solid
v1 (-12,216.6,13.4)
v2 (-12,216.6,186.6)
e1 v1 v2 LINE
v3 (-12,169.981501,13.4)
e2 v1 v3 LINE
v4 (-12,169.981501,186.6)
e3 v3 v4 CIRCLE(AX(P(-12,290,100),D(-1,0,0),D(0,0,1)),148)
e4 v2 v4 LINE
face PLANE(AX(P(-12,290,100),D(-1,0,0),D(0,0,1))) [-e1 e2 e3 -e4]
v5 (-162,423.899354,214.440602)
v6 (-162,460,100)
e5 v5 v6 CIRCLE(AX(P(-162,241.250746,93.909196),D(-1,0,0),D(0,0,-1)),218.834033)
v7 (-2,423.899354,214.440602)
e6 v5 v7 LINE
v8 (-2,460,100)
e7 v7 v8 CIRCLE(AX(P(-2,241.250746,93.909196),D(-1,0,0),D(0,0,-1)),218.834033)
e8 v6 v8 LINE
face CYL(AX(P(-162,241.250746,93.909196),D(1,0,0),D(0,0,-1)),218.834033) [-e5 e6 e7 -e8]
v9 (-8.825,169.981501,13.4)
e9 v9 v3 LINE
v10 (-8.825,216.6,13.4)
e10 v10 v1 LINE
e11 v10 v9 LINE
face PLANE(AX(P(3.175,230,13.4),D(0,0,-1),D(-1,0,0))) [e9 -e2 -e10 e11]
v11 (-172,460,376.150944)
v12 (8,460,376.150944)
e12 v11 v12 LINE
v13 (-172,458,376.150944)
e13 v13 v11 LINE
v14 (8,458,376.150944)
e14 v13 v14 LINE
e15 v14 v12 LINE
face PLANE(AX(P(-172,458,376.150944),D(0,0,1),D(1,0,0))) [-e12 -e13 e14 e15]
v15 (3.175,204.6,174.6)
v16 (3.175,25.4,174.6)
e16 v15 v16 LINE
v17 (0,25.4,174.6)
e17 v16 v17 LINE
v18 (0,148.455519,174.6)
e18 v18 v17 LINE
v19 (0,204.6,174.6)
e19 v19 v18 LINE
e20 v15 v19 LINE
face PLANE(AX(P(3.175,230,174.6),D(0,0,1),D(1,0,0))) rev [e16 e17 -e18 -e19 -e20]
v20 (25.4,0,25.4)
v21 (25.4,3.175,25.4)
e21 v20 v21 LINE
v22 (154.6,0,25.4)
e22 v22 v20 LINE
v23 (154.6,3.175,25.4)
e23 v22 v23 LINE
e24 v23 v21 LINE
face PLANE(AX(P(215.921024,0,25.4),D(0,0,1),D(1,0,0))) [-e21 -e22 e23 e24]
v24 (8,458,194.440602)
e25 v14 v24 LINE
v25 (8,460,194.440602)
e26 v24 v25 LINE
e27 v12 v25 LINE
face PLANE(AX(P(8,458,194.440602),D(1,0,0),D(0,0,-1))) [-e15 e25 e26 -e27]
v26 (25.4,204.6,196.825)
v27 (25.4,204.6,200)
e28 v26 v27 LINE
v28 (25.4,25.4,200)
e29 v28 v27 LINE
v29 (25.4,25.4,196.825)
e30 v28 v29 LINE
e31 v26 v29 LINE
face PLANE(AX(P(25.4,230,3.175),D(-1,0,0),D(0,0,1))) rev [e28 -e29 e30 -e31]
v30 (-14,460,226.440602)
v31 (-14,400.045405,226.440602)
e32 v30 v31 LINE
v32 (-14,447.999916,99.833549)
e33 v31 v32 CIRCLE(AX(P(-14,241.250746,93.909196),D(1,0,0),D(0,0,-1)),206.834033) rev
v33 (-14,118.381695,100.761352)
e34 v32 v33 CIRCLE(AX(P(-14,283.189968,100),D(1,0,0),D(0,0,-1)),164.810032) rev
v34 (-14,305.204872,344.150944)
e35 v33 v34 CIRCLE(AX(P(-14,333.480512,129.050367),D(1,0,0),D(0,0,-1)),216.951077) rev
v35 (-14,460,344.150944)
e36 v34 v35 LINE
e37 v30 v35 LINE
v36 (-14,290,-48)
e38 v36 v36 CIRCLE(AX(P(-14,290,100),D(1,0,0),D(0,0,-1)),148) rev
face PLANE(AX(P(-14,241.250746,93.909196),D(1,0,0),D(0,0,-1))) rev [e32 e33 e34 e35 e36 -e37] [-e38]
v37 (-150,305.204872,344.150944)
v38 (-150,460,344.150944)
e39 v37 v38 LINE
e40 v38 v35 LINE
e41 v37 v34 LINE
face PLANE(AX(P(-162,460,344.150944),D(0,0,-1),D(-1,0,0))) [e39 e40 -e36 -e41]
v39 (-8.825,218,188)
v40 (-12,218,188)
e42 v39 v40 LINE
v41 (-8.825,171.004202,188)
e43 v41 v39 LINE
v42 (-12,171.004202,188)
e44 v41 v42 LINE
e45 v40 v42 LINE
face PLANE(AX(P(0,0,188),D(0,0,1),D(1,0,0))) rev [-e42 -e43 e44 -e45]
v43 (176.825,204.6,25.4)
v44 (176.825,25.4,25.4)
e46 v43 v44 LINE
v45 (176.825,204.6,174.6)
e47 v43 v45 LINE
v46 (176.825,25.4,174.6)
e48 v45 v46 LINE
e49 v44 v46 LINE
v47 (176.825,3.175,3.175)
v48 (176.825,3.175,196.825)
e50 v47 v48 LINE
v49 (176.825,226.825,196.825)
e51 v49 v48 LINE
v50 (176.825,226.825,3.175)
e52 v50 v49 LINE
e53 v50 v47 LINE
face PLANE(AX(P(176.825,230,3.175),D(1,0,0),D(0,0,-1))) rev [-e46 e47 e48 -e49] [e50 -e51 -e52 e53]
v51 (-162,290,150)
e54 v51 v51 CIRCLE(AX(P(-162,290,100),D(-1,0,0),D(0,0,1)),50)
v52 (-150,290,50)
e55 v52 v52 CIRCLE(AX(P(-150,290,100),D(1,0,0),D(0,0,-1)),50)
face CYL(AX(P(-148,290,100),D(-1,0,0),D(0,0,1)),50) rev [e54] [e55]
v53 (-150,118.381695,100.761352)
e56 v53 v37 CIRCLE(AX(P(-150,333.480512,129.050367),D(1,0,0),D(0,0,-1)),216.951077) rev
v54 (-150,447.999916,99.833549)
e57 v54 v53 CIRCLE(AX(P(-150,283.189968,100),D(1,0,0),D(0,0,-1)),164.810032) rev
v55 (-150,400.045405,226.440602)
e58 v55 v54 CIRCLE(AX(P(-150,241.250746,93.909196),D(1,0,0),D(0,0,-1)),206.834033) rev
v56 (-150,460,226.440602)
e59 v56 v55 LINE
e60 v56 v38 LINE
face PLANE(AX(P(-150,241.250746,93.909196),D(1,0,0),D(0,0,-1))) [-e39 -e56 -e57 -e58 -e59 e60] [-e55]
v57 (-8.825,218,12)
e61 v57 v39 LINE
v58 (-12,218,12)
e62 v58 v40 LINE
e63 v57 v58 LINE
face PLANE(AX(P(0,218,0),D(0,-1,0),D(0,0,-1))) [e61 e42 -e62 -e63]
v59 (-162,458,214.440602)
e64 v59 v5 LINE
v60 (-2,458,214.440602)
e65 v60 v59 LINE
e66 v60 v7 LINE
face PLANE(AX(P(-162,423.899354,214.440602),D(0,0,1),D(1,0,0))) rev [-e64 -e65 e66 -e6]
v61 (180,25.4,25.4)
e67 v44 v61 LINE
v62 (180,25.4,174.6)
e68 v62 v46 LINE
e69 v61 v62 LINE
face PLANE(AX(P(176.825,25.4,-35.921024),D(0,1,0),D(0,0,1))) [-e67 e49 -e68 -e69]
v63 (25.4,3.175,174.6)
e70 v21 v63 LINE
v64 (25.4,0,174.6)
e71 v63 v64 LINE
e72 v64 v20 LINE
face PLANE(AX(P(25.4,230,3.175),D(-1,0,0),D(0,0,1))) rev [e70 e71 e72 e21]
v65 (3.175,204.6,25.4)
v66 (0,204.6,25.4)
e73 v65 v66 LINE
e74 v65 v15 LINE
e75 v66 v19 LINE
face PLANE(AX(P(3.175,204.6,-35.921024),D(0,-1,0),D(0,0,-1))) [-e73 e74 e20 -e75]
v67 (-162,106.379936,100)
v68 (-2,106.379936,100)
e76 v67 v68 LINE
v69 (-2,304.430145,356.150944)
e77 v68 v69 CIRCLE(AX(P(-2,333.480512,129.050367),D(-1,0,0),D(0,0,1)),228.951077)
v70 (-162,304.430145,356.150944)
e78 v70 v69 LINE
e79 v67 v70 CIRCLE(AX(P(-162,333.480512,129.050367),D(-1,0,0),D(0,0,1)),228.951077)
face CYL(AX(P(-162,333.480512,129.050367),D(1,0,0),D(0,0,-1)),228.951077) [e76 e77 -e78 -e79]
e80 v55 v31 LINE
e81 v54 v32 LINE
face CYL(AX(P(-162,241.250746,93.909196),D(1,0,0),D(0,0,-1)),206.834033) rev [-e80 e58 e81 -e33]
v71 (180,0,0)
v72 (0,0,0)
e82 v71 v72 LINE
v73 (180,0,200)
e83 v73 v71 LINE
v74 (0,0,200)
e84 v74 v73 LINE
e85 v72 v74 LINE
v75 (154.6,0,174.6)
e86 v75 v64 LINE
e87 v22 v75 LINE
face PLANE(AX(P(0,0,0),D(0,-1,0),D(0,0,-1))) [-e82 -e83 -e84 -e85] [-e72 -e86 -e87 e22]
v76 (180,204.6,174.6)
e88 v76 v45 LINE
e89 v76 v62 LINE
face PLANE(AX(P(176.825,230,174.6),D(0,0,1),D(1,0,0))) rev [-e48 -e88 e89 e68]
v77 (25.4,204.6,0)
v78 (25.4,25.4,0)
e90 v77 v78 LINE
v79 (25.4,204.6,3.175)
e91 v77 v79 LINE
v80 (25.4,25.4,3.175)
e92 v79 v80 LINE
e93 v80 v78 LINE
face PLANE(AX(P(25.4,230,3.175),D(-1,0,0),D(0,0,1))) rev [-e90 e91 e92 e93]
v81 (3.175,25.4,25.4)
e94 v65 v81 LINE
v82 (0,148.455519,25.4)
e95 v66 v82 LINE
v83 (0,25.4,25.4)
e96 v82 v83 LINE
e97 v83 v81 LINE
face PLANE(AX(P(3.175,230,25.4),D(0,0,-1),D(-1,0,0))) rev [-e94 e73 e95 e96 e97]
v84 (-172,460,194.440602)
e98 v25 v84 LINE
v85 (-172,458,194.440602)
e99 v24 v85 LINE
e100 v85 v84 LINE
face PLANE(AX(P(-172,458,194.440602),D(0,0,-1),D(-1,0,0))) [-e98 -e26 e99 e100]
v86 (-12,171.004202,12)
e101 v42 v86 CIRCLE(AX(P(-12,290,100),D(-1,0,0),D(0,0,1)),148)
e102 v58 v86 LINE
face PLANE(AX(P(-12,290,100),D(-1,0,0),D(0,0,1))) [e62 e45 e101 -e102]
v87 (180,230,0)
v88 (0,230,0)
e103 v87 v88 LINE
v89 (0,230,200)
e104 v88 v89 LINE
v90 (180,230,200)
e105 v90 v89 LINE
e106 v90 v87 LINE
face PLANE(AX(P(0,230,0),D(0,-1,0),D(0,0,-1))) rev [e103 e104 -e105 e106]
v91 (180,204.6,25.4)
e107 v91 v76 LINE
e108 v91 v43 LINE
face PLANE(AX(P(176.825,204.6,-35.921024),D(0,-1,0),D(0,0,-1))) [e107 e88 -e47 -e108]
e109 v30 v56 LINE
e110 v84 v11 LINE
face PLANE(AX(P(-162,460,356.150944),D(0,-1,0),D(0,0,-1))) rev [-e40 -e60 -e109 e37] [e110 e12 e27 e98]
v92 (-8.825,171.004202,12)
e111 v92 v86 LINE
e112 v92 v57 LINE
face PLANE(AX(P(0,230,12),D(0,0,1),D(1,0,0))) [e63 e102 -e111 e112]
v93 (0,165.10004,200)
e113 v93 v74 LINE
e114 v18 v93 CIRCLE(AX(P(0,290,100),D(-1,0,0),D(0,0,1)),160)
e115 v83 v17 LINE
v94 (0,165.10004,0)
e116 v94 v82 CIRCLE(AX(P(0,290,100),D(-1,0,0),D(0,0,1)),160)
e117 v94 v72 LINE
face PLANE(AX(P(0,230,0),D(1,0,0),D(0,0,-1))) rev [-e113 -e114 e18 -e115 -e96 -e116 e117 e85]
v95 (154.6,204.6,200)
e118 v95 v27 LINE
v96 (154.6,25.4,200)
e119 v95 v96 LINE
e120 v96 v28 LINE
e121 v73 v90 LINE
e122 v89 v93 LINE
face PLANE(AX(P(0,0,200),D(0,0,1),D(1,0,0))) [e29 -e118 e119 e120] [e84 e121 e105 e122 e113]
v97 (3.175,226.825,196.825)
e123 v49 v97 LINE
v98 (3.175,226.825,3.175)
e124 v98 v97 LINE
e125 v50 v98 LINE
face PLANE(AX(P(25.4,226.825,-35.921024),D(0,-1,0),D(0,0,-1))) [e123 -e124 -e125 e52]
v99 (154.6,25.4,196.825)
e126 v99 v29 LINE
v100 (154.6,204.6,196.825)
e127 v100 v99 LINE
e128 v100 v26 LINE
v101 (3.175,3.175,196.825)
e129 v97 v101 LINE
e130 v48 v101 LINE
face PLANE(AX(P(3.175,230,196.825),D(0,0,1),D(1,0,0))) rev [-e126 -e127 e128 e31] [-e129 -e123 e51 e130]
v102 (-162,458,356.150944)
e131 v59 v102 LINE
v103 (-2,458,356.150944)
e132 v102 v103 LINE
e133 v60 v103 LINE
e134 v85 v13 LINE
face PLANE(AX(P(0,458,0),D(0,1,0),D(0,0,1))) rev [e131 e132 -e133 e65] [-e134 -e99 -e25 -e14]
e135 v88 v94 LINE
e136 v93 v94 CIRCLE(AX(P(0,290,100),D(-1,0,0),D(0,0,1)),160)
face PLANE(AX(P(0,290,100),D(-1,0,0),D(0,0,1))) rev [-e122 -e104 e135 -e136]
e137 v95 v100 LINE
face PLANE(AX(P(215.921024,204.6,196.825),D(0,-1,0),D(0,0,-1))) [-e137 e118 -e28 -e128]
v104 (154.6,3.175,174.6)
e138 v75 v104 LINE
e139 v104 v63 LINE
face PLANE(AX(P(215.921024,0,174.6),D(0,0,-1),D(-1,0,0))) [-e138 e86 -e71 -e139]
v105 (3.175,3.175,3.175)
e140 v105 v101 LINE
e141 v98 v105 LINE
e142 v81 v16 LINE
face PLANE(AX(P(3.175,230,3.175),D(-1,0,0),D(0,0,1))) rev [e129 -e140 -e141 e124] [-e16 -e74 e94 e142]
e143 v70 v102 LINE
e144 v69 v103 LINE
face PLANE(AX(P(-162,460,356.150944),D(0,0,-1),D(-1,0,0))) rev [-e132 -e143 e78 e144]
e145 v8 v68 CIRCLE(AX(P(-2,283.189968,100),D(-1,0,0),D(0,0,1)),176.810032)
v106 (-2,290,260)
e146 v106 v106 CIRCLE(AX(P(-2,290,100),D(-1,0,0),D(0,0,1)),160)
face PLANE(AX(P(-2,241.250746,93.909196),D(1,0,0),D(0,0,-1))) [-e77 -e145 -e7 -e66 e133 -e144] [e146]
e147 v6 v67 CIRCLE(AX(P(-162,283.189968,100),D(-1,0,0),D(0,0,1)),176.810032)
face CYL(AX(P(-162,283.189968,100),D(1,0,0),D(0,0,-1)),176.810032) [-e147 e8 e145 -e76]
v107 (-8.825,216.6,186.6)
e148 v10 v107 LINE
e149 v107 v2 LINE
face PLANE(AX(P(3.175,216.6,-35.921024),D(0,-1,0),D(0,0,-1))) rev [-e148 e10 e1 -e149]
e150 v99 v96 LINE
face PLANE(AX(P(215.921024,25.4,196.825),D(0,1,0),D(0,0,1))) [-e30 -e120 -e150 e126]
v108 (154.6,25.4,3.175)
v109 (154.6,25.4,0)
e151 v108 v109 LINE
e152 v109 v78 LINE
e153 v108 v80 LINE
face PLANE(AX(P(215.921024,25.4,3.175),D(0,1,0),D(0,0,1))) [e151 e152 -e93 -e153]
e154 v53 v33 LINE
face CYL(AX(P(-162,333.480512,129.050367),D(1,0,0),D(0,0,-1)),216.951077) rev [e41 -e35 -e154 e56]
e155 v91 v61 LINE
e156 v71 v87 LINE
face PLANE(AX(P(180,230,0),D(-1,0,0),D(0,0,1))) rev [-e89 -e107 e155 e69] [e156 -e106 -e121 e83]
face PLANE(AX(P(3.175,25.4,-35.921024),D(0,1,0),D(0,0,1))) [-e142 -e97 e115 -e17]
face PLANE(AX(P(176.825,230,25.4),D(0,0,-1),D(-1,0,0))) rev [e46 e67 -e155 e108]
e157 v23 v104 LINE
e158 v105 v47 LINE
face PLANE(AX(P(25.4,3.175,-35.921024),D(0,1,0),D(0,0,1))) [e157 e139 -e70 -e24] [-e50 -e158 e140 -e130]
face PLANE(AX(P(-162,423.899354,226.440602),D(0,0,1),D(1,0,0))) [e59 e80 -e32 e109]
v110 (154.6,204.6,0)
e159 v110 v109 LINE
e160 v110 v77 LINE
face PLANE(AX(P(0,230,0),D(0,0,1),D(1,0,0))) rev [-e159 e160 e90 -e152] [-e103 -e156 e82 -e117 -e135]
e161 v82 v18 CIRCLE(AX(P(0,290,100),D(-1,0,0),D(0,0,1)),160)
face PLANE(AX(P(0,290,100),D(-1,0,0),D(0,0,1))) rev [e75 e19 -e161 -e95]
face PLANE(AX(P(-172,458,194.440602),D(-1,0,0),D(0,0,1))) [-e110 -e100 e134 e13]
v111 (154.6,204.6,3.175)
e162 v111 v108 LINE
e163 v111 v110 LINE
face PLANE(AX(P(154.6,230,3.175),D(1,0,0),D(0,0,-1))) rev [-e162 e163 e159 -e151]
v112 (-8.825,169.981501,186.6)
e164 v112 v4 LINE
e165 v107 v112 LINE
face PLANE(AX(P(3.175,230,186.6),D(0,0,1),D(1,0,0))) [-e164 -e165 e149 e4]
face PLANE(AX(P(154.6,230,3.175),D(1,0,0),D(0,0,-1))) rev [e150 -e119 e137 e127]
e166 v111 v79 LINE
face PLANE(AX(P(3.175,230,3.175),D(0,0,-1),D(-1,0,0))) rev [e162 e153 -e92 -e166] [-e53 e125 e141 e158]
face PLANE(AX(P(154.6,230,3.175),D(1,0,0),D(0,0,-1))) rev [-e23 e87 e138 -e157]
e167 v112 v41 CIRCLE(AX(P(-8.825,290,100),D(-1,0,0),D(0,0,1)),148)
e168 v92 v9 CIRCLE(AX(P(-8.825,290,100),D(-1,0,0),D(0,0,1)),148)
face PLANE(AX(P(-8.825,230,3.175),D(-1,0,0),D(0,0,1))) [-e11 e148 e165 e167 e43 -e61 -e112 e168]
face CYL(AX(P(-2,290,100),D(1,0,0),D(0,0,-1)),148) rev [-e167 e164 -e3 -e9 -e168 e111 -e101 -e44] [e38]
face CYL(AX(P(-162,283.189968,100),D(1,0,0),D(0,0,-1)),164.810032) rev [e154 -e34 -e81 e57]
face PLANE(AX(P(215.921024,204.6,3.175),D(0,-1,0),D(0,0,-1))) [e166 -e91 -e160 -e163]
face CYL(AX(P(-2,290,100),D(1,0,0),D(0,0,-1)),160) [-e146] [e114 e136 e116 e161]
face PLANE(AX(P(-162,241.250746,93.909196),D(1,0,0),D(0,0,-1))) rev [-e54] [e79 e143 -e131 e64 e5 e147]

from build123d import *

# Parameters (mm, degrees)
SALIENTE_EXTRUIR1_DEPTH   = 230
SALIENTE_EXTRUIR1_2_DEPTH = 230
SALIENTE_EXTRUIR1_3_DEPTH = 230
SALIENTE_EXTRUIR1_4_DEPTH = 230
SALIENTE_EXTRUIR2_REACH   = 355.977
SALIENTE_EXTRUIR3_DEPTH   = 180
CROQUIS4_W                = 149.2
CROQUIS4_H                = 3.175
SALIENTE_EXTRUIR4_DEPTH   = 154.6
CROQUIS5_R                = 160
SALIENTE_EXTRUIR5_DEPTH   = 2
SALIENTE_EXTRUIR6_DEPTH   = 160
CROQUIS7_W                = 180
CROQUIS7_H                = 181.710341205
SALIENTE_EXTRUIR7_DEPTH   = 2
VACIADO1_START            = -150
VACIADO1_DEPTH            = 136
VACIADO1_START_2          = -14
VACIADO1_2_OUTLINE_R      = 148
VACIADO1_2_DEPTH          = 2
VACIADO1_START_3          = -12
VACIADO1_3_DEPTH          = 3.175
CROQUIS8_R                = 50
CORTAR_EXTRUIR1_DEPTH     = 14


# Read off the part's stored shape, not the designer's step: Vaciado1
with BuildPart() as part:
    # Croquis1 → Saliente-Extruir1 (new body)
    with BuildSketch(Plane(origin=(0, 0, 0), x_dir=(1, 0, 0), z_dir=(0, 1, 0))):
        Polygon((0, 0), (25.4, 0), (25.4, -3.175), (3.175, -3.175), (3.175, -25.4), (0, -25.4), align=None)
    extrude(amount=SALIENTE_EXTRUIR1_DEPTH)

    # Saliente-Extruir2: up to this face of the body (flat: up to its plane)
    saliente_extruir2_end = Plane(part.part.faces().sort_by_distance((12.7, 115, 0))[0])
    # Croquis2 → Saliente-Extruir2 (add, up to the picked face)
    with BuildSketch(Plane.XY.offset(200), mode=Mode.PRIVATE) as saliente_extruir2_sk1:
        Polygon((25.4, 230), (0, 230), (0, 204.6), (3.175, 204.6), (3.175, 226.825), (25.4, 226.825), align=None)
    saliente_extruir2_tool1 = split(extrude(saliente_extruir2_sk1.sketch, amount=-SALIENTE_EXTRUIR2_REACH, mode=Mode.PRIVATE), bisect_by=saliente_extruir2_end, keep=Keep.BOTH, mode=Mode.PRIVATE)
    # Croquis2 → Saliente-Extruir2 (add, up to the picked face)
    with BuildSketch(Plane.XY.offset(200), mode=Mode.PRIVATE) as saliente_extruir2_sk2:
        Polygon((176.825, 204.6), (180, 204.6), (180, 230), (154.6, 230), (154.6, 226.825), (176.825, 226.825), align=None)
    saliente_extruir2_tool2 = split(extrude(saliente_extruir2_sk2.sketch, amount=-SALIENTE_EXTRUIR2_REACH, mode=Mode.PRIVATE), bisect_by=saliente_extruir2_end, keep=Keep.BOTH, mode=Mode.PRIVATE)
    # Croquis2 → Saliente-Extruir2 (add, up to the picked face)
    with BuildSketch(Plane.XY.offset(200), mode=Mode.PRIVATE) as saliente_extruir2_sk3:
        Polygon((154.6, 0), (180, 0), (180, 25.4), (176.825, 25.4), (176.825, 3.175), (154.6, 3.175), align=None)
    saliente_extruir2_tool3 = split(extrude(saliente_extruir2_sk3.sketch, amount=-SALIENTE_EXTRUIR2_REACH, mode=Mode.PRIVATE), bisect_by=saliente_extruir2_end, keep=Keep.BOTH, mode=Mode.PRIVATE)
    # Croquis2 → Saliente-Extruir2 (add, up to the picked face)
    with BuildSketch(Plane.XY.offset(200), mode=Mode.PRIVATE) as saliente_extruir2_sk4:
        Polygon((3.175, 25.4), (0, 25.4), (0, 0), (25.4, 0), (25.4, 3.175), (3.175, 3.175), align=None)
    saliente_extruir2_tool4 = split(extrude(saliente_extruir2_sk4.sketch, amount=-SALIENTE_EXTRUIR2_REACH, mode=Mode.PRIVATE), bisect_by=saliente_extruir2_end, keep=Keep.BOTH, mode=Mode.PRIVATE)


with BuildPart() as body_2:
    # Croquis1 → Saliente-Extruir1 2 (new body)
    with BuildSketch(Plane(origin=(0, 0, 0), x_dir=(1, 0, 0), z_dir=(0, 1, 0))):
        Polygon((176.825, -25.4), (180, -25.4), (180, 0), (154.6, 0), (154.6, -3.175), (176.825, -3.175), align=None)
    extrude(amount=SALIENTE_EXTRUIR1_2_DEPTH)


with BuildPart() as body_3:
    # Croquis1 → Saliente-Extruir1 3 (new body)
    with BuildSketch(Plane(origin=(0, 0, 0), x_dir=(1, 0, 0), z_dir=(0, 1, 0))):
        Polygon((180, -200), (154.6, -200), (154.6, -196.825), (176.825, -196.825), (176.825, -174.6), (180, -174.6), align=None)
    extrude(amount=SALIENTE_EXTRUIR1_3_DEPTH)


with BuildPart() as body_4:
    # Croquis1 → Saliente-Extruir1 4 (new body)
    with BuildSketch(Plane(origin=(0, 0, 0), x_dir=(1, 0, 0), z_dir=(0, 1, 0))):
        Polygon((3.175, -174.6), (0, -174.6), (0, -200), (25.4, -200), (25.4, -196.825), (3.175, -196.825), align=None)
    extrude(amount=SALIENTE_EXTRUIR1_4_DEPTH)


with BuildPart() as part_1:
    add(part.part)

    add(body_2.part)  # Saliente-Extruir2 merges body 2

    add(body_3.part)  # Saliente-Extruir2 merges body 3

    add(body_4.part)  # Saliente-Extruir2 merges body 4
    add(saliente_extruir2_tool1.solids().sort_by(Axis((12.7, 229.64079, 200), (0, 0, -1)))[0])
    add(saliente_extruir2_tool2.solids().sort_by(Axis((178.4125, 204.95921, 200), (0, 0, -1)))[0])
    add(saliente_extruir2_tool3.solids().sort_by(Axis((167.3, 0.35921, 200), (0, 0, -1)))[0])
    add(saliente_extruir2_tool4.solids().sort_by(Axis((1.5875, 25.04079, 200), (0, 0, -1)))[0])

    # Croquis3 → Saliente-Extruir3 (add)
    with BuildSketch(Plane.ZY):
        Polygon((0, 0), (25.4, 0), (25.4, 3.175), (3.175, 3.175), (3.175, 25.4), (0, 25.4), align=None)
        Polygon((196.825, 25.4), (200, 25.4), (200, 0), (174.6, 0), (174.6, 3.175), (196.825, 3.175), align=None)
        Polygon((200, 230), (174.6, 230), (174.6, 226.825), (196.825, 226.825), (196.825, 204.6), (200, 204.6), align=None)
        Polygon((3.175, 204.6), (0, 204.6), (0, 230), (25.4, 230), (25.4, 226.825), (3.175, 226.825), align=None)
    extrude(amount=-SALIENTE_EXTRUIR3_DEPTH)

    # Croquis4 → Saliente-Extruir4 (add)
    with BuildSketch(Plane(origin=(180, 0, 0), x_dir=(0, 0, -1), z_dir=(1, 0, 0))):
        with Locations((-100, 228.4125)):
            Rectangle(CROQUIS4_W, CROQUIS4_H)
    extrude(amount=-SALIENTE_EXTRUIR4_DEPTH)

    # Croquis5 → Saliente-Extruir5 (add)
    with BuildSketch(Plane.ZY):
        with Locations(Location((100, 290, 0), (0, 0, 231.317812547))):
            Circle(CROQUIS5_R)
    extrude(amount=SALIENTE_EXTRUIR5_DEPTH)

    # Croquis6 → Saliente-Extruir6 (add)
    with BuildSketch(Plane.ZY.offset(2)):
        with BuildLine():
            Line((356.150943647, 460), (214.440602442, 460))
            Line((214.440602442, 460), (214.440602442, 423.899354359))
            ThreePointArc((214.440602442, 423.899354359), (159.743155313, 449.947233376), (100, 460))
            ThreePointArc((100, 460), (-76.81003198, 283.18996802), (100, 106.379936039))
            ThreePointArc((100, 106.379936039), (269.093013095, 152.354443037), (356.150943647, 304.430144907))
            Line((356.150943647, 304.430144907), (356.150943647, 460))
        make_face()
    extrude(amount=SALIENTE_EXTRUIR6_DEPTH)

    # Croquis7 → Saliente-Extruir7 (add)
    with BuildSketch(Plane(origin=(0, 460, 0), x_dir=(1, 0, 0), z_dir=(0, 1, 0))):
        with Locations((-82, -285.295773045)):
            Rectangle(CROQUIS7_W, CROQUIS7_H)
    extrude(amount=-SALIENTE_EXTRUIR7_DEPTH)

    # Vaciado1 outline → Vaciado1 (cut)
    with BuildSketch(Plane.YZ.offset(VACIADO1_START)):
        with BuildLine():
            Line((460, 344.150943647), (305.204872044, 344.150943647))
            ThreePointArc((305.204872044, 344.150943647), (161.38343221, 261.150196169), (118.381694611, 100.761352414))
            ThreePointArc((118.381694611, 100.761352414), (282.726065317, -64.809379089), (447.999915945, 99.833548521))
            ThreePointArc((447.999915945, 99.833548521), (434.67491503, 167.171792789), (400.045404599, 226.440602442))
            Line((400.045404599, 226.440602442), (460, 226.440602442))
            Line((460, 226.440602442), (460, 344.150943647))
        make_face()
    extrude(amount=VACIADO1_DEPTH, mode=Mode.SUBTRACT)

    # Vaciado1 2 outline → Vaciado1 2 (cut)
    with BuildSketch(Plane.YZ.offset(VACIADO1_START_2)):
        with Locations((290, 100)):
            Circle(VACIADO1_2_OUTLINE_R)
    extrude(amount=VACIADO1_2_DEPTH, mode=Mode.SUBTRACT)

    # Vaciado1 3 outline → Vaciado1 3 (cut)
    with BuildSketch(Plane.YZ.offset(VACIADO1_START_3)):
        with BuildLine():
            Line((169.981501426, 186.6), (216.6, 186.6))
            Line((216.6, 186.6), (216.6, 13.4))
            Line((216.6, 13.4), (169.981501426, 13.4))
            ThreePointArc((169.981501426, 13.4), (170.490801521, 12.698502424), (171.004201755, 12))
            Line((171.004201755, 12), (218, 12))
            Line((218, 12), (218, 188))
            Line((218, 188), (171.004201755, 188))
            ThreePointArc((171.004201755, 188), (170.490801521, 187.301497576), (169.981501426, 186.6))
        make_face()
    extrude(amount=VACIADO1_3_DEPTH, mode=Mode.SUBTRACT)

    # Croquis8 → Cortar-Extruir1 (cut)
    with BuildSketch(Plane.ZY.offset(162)):
        with Locations((100, 290)):
            Circle(CROQUIS8_R)
    extrude(amount=-CORTAR_EXTRUIR1_DEPTH, mode=Mode.SUBTRACT)


solid = part_1.part
